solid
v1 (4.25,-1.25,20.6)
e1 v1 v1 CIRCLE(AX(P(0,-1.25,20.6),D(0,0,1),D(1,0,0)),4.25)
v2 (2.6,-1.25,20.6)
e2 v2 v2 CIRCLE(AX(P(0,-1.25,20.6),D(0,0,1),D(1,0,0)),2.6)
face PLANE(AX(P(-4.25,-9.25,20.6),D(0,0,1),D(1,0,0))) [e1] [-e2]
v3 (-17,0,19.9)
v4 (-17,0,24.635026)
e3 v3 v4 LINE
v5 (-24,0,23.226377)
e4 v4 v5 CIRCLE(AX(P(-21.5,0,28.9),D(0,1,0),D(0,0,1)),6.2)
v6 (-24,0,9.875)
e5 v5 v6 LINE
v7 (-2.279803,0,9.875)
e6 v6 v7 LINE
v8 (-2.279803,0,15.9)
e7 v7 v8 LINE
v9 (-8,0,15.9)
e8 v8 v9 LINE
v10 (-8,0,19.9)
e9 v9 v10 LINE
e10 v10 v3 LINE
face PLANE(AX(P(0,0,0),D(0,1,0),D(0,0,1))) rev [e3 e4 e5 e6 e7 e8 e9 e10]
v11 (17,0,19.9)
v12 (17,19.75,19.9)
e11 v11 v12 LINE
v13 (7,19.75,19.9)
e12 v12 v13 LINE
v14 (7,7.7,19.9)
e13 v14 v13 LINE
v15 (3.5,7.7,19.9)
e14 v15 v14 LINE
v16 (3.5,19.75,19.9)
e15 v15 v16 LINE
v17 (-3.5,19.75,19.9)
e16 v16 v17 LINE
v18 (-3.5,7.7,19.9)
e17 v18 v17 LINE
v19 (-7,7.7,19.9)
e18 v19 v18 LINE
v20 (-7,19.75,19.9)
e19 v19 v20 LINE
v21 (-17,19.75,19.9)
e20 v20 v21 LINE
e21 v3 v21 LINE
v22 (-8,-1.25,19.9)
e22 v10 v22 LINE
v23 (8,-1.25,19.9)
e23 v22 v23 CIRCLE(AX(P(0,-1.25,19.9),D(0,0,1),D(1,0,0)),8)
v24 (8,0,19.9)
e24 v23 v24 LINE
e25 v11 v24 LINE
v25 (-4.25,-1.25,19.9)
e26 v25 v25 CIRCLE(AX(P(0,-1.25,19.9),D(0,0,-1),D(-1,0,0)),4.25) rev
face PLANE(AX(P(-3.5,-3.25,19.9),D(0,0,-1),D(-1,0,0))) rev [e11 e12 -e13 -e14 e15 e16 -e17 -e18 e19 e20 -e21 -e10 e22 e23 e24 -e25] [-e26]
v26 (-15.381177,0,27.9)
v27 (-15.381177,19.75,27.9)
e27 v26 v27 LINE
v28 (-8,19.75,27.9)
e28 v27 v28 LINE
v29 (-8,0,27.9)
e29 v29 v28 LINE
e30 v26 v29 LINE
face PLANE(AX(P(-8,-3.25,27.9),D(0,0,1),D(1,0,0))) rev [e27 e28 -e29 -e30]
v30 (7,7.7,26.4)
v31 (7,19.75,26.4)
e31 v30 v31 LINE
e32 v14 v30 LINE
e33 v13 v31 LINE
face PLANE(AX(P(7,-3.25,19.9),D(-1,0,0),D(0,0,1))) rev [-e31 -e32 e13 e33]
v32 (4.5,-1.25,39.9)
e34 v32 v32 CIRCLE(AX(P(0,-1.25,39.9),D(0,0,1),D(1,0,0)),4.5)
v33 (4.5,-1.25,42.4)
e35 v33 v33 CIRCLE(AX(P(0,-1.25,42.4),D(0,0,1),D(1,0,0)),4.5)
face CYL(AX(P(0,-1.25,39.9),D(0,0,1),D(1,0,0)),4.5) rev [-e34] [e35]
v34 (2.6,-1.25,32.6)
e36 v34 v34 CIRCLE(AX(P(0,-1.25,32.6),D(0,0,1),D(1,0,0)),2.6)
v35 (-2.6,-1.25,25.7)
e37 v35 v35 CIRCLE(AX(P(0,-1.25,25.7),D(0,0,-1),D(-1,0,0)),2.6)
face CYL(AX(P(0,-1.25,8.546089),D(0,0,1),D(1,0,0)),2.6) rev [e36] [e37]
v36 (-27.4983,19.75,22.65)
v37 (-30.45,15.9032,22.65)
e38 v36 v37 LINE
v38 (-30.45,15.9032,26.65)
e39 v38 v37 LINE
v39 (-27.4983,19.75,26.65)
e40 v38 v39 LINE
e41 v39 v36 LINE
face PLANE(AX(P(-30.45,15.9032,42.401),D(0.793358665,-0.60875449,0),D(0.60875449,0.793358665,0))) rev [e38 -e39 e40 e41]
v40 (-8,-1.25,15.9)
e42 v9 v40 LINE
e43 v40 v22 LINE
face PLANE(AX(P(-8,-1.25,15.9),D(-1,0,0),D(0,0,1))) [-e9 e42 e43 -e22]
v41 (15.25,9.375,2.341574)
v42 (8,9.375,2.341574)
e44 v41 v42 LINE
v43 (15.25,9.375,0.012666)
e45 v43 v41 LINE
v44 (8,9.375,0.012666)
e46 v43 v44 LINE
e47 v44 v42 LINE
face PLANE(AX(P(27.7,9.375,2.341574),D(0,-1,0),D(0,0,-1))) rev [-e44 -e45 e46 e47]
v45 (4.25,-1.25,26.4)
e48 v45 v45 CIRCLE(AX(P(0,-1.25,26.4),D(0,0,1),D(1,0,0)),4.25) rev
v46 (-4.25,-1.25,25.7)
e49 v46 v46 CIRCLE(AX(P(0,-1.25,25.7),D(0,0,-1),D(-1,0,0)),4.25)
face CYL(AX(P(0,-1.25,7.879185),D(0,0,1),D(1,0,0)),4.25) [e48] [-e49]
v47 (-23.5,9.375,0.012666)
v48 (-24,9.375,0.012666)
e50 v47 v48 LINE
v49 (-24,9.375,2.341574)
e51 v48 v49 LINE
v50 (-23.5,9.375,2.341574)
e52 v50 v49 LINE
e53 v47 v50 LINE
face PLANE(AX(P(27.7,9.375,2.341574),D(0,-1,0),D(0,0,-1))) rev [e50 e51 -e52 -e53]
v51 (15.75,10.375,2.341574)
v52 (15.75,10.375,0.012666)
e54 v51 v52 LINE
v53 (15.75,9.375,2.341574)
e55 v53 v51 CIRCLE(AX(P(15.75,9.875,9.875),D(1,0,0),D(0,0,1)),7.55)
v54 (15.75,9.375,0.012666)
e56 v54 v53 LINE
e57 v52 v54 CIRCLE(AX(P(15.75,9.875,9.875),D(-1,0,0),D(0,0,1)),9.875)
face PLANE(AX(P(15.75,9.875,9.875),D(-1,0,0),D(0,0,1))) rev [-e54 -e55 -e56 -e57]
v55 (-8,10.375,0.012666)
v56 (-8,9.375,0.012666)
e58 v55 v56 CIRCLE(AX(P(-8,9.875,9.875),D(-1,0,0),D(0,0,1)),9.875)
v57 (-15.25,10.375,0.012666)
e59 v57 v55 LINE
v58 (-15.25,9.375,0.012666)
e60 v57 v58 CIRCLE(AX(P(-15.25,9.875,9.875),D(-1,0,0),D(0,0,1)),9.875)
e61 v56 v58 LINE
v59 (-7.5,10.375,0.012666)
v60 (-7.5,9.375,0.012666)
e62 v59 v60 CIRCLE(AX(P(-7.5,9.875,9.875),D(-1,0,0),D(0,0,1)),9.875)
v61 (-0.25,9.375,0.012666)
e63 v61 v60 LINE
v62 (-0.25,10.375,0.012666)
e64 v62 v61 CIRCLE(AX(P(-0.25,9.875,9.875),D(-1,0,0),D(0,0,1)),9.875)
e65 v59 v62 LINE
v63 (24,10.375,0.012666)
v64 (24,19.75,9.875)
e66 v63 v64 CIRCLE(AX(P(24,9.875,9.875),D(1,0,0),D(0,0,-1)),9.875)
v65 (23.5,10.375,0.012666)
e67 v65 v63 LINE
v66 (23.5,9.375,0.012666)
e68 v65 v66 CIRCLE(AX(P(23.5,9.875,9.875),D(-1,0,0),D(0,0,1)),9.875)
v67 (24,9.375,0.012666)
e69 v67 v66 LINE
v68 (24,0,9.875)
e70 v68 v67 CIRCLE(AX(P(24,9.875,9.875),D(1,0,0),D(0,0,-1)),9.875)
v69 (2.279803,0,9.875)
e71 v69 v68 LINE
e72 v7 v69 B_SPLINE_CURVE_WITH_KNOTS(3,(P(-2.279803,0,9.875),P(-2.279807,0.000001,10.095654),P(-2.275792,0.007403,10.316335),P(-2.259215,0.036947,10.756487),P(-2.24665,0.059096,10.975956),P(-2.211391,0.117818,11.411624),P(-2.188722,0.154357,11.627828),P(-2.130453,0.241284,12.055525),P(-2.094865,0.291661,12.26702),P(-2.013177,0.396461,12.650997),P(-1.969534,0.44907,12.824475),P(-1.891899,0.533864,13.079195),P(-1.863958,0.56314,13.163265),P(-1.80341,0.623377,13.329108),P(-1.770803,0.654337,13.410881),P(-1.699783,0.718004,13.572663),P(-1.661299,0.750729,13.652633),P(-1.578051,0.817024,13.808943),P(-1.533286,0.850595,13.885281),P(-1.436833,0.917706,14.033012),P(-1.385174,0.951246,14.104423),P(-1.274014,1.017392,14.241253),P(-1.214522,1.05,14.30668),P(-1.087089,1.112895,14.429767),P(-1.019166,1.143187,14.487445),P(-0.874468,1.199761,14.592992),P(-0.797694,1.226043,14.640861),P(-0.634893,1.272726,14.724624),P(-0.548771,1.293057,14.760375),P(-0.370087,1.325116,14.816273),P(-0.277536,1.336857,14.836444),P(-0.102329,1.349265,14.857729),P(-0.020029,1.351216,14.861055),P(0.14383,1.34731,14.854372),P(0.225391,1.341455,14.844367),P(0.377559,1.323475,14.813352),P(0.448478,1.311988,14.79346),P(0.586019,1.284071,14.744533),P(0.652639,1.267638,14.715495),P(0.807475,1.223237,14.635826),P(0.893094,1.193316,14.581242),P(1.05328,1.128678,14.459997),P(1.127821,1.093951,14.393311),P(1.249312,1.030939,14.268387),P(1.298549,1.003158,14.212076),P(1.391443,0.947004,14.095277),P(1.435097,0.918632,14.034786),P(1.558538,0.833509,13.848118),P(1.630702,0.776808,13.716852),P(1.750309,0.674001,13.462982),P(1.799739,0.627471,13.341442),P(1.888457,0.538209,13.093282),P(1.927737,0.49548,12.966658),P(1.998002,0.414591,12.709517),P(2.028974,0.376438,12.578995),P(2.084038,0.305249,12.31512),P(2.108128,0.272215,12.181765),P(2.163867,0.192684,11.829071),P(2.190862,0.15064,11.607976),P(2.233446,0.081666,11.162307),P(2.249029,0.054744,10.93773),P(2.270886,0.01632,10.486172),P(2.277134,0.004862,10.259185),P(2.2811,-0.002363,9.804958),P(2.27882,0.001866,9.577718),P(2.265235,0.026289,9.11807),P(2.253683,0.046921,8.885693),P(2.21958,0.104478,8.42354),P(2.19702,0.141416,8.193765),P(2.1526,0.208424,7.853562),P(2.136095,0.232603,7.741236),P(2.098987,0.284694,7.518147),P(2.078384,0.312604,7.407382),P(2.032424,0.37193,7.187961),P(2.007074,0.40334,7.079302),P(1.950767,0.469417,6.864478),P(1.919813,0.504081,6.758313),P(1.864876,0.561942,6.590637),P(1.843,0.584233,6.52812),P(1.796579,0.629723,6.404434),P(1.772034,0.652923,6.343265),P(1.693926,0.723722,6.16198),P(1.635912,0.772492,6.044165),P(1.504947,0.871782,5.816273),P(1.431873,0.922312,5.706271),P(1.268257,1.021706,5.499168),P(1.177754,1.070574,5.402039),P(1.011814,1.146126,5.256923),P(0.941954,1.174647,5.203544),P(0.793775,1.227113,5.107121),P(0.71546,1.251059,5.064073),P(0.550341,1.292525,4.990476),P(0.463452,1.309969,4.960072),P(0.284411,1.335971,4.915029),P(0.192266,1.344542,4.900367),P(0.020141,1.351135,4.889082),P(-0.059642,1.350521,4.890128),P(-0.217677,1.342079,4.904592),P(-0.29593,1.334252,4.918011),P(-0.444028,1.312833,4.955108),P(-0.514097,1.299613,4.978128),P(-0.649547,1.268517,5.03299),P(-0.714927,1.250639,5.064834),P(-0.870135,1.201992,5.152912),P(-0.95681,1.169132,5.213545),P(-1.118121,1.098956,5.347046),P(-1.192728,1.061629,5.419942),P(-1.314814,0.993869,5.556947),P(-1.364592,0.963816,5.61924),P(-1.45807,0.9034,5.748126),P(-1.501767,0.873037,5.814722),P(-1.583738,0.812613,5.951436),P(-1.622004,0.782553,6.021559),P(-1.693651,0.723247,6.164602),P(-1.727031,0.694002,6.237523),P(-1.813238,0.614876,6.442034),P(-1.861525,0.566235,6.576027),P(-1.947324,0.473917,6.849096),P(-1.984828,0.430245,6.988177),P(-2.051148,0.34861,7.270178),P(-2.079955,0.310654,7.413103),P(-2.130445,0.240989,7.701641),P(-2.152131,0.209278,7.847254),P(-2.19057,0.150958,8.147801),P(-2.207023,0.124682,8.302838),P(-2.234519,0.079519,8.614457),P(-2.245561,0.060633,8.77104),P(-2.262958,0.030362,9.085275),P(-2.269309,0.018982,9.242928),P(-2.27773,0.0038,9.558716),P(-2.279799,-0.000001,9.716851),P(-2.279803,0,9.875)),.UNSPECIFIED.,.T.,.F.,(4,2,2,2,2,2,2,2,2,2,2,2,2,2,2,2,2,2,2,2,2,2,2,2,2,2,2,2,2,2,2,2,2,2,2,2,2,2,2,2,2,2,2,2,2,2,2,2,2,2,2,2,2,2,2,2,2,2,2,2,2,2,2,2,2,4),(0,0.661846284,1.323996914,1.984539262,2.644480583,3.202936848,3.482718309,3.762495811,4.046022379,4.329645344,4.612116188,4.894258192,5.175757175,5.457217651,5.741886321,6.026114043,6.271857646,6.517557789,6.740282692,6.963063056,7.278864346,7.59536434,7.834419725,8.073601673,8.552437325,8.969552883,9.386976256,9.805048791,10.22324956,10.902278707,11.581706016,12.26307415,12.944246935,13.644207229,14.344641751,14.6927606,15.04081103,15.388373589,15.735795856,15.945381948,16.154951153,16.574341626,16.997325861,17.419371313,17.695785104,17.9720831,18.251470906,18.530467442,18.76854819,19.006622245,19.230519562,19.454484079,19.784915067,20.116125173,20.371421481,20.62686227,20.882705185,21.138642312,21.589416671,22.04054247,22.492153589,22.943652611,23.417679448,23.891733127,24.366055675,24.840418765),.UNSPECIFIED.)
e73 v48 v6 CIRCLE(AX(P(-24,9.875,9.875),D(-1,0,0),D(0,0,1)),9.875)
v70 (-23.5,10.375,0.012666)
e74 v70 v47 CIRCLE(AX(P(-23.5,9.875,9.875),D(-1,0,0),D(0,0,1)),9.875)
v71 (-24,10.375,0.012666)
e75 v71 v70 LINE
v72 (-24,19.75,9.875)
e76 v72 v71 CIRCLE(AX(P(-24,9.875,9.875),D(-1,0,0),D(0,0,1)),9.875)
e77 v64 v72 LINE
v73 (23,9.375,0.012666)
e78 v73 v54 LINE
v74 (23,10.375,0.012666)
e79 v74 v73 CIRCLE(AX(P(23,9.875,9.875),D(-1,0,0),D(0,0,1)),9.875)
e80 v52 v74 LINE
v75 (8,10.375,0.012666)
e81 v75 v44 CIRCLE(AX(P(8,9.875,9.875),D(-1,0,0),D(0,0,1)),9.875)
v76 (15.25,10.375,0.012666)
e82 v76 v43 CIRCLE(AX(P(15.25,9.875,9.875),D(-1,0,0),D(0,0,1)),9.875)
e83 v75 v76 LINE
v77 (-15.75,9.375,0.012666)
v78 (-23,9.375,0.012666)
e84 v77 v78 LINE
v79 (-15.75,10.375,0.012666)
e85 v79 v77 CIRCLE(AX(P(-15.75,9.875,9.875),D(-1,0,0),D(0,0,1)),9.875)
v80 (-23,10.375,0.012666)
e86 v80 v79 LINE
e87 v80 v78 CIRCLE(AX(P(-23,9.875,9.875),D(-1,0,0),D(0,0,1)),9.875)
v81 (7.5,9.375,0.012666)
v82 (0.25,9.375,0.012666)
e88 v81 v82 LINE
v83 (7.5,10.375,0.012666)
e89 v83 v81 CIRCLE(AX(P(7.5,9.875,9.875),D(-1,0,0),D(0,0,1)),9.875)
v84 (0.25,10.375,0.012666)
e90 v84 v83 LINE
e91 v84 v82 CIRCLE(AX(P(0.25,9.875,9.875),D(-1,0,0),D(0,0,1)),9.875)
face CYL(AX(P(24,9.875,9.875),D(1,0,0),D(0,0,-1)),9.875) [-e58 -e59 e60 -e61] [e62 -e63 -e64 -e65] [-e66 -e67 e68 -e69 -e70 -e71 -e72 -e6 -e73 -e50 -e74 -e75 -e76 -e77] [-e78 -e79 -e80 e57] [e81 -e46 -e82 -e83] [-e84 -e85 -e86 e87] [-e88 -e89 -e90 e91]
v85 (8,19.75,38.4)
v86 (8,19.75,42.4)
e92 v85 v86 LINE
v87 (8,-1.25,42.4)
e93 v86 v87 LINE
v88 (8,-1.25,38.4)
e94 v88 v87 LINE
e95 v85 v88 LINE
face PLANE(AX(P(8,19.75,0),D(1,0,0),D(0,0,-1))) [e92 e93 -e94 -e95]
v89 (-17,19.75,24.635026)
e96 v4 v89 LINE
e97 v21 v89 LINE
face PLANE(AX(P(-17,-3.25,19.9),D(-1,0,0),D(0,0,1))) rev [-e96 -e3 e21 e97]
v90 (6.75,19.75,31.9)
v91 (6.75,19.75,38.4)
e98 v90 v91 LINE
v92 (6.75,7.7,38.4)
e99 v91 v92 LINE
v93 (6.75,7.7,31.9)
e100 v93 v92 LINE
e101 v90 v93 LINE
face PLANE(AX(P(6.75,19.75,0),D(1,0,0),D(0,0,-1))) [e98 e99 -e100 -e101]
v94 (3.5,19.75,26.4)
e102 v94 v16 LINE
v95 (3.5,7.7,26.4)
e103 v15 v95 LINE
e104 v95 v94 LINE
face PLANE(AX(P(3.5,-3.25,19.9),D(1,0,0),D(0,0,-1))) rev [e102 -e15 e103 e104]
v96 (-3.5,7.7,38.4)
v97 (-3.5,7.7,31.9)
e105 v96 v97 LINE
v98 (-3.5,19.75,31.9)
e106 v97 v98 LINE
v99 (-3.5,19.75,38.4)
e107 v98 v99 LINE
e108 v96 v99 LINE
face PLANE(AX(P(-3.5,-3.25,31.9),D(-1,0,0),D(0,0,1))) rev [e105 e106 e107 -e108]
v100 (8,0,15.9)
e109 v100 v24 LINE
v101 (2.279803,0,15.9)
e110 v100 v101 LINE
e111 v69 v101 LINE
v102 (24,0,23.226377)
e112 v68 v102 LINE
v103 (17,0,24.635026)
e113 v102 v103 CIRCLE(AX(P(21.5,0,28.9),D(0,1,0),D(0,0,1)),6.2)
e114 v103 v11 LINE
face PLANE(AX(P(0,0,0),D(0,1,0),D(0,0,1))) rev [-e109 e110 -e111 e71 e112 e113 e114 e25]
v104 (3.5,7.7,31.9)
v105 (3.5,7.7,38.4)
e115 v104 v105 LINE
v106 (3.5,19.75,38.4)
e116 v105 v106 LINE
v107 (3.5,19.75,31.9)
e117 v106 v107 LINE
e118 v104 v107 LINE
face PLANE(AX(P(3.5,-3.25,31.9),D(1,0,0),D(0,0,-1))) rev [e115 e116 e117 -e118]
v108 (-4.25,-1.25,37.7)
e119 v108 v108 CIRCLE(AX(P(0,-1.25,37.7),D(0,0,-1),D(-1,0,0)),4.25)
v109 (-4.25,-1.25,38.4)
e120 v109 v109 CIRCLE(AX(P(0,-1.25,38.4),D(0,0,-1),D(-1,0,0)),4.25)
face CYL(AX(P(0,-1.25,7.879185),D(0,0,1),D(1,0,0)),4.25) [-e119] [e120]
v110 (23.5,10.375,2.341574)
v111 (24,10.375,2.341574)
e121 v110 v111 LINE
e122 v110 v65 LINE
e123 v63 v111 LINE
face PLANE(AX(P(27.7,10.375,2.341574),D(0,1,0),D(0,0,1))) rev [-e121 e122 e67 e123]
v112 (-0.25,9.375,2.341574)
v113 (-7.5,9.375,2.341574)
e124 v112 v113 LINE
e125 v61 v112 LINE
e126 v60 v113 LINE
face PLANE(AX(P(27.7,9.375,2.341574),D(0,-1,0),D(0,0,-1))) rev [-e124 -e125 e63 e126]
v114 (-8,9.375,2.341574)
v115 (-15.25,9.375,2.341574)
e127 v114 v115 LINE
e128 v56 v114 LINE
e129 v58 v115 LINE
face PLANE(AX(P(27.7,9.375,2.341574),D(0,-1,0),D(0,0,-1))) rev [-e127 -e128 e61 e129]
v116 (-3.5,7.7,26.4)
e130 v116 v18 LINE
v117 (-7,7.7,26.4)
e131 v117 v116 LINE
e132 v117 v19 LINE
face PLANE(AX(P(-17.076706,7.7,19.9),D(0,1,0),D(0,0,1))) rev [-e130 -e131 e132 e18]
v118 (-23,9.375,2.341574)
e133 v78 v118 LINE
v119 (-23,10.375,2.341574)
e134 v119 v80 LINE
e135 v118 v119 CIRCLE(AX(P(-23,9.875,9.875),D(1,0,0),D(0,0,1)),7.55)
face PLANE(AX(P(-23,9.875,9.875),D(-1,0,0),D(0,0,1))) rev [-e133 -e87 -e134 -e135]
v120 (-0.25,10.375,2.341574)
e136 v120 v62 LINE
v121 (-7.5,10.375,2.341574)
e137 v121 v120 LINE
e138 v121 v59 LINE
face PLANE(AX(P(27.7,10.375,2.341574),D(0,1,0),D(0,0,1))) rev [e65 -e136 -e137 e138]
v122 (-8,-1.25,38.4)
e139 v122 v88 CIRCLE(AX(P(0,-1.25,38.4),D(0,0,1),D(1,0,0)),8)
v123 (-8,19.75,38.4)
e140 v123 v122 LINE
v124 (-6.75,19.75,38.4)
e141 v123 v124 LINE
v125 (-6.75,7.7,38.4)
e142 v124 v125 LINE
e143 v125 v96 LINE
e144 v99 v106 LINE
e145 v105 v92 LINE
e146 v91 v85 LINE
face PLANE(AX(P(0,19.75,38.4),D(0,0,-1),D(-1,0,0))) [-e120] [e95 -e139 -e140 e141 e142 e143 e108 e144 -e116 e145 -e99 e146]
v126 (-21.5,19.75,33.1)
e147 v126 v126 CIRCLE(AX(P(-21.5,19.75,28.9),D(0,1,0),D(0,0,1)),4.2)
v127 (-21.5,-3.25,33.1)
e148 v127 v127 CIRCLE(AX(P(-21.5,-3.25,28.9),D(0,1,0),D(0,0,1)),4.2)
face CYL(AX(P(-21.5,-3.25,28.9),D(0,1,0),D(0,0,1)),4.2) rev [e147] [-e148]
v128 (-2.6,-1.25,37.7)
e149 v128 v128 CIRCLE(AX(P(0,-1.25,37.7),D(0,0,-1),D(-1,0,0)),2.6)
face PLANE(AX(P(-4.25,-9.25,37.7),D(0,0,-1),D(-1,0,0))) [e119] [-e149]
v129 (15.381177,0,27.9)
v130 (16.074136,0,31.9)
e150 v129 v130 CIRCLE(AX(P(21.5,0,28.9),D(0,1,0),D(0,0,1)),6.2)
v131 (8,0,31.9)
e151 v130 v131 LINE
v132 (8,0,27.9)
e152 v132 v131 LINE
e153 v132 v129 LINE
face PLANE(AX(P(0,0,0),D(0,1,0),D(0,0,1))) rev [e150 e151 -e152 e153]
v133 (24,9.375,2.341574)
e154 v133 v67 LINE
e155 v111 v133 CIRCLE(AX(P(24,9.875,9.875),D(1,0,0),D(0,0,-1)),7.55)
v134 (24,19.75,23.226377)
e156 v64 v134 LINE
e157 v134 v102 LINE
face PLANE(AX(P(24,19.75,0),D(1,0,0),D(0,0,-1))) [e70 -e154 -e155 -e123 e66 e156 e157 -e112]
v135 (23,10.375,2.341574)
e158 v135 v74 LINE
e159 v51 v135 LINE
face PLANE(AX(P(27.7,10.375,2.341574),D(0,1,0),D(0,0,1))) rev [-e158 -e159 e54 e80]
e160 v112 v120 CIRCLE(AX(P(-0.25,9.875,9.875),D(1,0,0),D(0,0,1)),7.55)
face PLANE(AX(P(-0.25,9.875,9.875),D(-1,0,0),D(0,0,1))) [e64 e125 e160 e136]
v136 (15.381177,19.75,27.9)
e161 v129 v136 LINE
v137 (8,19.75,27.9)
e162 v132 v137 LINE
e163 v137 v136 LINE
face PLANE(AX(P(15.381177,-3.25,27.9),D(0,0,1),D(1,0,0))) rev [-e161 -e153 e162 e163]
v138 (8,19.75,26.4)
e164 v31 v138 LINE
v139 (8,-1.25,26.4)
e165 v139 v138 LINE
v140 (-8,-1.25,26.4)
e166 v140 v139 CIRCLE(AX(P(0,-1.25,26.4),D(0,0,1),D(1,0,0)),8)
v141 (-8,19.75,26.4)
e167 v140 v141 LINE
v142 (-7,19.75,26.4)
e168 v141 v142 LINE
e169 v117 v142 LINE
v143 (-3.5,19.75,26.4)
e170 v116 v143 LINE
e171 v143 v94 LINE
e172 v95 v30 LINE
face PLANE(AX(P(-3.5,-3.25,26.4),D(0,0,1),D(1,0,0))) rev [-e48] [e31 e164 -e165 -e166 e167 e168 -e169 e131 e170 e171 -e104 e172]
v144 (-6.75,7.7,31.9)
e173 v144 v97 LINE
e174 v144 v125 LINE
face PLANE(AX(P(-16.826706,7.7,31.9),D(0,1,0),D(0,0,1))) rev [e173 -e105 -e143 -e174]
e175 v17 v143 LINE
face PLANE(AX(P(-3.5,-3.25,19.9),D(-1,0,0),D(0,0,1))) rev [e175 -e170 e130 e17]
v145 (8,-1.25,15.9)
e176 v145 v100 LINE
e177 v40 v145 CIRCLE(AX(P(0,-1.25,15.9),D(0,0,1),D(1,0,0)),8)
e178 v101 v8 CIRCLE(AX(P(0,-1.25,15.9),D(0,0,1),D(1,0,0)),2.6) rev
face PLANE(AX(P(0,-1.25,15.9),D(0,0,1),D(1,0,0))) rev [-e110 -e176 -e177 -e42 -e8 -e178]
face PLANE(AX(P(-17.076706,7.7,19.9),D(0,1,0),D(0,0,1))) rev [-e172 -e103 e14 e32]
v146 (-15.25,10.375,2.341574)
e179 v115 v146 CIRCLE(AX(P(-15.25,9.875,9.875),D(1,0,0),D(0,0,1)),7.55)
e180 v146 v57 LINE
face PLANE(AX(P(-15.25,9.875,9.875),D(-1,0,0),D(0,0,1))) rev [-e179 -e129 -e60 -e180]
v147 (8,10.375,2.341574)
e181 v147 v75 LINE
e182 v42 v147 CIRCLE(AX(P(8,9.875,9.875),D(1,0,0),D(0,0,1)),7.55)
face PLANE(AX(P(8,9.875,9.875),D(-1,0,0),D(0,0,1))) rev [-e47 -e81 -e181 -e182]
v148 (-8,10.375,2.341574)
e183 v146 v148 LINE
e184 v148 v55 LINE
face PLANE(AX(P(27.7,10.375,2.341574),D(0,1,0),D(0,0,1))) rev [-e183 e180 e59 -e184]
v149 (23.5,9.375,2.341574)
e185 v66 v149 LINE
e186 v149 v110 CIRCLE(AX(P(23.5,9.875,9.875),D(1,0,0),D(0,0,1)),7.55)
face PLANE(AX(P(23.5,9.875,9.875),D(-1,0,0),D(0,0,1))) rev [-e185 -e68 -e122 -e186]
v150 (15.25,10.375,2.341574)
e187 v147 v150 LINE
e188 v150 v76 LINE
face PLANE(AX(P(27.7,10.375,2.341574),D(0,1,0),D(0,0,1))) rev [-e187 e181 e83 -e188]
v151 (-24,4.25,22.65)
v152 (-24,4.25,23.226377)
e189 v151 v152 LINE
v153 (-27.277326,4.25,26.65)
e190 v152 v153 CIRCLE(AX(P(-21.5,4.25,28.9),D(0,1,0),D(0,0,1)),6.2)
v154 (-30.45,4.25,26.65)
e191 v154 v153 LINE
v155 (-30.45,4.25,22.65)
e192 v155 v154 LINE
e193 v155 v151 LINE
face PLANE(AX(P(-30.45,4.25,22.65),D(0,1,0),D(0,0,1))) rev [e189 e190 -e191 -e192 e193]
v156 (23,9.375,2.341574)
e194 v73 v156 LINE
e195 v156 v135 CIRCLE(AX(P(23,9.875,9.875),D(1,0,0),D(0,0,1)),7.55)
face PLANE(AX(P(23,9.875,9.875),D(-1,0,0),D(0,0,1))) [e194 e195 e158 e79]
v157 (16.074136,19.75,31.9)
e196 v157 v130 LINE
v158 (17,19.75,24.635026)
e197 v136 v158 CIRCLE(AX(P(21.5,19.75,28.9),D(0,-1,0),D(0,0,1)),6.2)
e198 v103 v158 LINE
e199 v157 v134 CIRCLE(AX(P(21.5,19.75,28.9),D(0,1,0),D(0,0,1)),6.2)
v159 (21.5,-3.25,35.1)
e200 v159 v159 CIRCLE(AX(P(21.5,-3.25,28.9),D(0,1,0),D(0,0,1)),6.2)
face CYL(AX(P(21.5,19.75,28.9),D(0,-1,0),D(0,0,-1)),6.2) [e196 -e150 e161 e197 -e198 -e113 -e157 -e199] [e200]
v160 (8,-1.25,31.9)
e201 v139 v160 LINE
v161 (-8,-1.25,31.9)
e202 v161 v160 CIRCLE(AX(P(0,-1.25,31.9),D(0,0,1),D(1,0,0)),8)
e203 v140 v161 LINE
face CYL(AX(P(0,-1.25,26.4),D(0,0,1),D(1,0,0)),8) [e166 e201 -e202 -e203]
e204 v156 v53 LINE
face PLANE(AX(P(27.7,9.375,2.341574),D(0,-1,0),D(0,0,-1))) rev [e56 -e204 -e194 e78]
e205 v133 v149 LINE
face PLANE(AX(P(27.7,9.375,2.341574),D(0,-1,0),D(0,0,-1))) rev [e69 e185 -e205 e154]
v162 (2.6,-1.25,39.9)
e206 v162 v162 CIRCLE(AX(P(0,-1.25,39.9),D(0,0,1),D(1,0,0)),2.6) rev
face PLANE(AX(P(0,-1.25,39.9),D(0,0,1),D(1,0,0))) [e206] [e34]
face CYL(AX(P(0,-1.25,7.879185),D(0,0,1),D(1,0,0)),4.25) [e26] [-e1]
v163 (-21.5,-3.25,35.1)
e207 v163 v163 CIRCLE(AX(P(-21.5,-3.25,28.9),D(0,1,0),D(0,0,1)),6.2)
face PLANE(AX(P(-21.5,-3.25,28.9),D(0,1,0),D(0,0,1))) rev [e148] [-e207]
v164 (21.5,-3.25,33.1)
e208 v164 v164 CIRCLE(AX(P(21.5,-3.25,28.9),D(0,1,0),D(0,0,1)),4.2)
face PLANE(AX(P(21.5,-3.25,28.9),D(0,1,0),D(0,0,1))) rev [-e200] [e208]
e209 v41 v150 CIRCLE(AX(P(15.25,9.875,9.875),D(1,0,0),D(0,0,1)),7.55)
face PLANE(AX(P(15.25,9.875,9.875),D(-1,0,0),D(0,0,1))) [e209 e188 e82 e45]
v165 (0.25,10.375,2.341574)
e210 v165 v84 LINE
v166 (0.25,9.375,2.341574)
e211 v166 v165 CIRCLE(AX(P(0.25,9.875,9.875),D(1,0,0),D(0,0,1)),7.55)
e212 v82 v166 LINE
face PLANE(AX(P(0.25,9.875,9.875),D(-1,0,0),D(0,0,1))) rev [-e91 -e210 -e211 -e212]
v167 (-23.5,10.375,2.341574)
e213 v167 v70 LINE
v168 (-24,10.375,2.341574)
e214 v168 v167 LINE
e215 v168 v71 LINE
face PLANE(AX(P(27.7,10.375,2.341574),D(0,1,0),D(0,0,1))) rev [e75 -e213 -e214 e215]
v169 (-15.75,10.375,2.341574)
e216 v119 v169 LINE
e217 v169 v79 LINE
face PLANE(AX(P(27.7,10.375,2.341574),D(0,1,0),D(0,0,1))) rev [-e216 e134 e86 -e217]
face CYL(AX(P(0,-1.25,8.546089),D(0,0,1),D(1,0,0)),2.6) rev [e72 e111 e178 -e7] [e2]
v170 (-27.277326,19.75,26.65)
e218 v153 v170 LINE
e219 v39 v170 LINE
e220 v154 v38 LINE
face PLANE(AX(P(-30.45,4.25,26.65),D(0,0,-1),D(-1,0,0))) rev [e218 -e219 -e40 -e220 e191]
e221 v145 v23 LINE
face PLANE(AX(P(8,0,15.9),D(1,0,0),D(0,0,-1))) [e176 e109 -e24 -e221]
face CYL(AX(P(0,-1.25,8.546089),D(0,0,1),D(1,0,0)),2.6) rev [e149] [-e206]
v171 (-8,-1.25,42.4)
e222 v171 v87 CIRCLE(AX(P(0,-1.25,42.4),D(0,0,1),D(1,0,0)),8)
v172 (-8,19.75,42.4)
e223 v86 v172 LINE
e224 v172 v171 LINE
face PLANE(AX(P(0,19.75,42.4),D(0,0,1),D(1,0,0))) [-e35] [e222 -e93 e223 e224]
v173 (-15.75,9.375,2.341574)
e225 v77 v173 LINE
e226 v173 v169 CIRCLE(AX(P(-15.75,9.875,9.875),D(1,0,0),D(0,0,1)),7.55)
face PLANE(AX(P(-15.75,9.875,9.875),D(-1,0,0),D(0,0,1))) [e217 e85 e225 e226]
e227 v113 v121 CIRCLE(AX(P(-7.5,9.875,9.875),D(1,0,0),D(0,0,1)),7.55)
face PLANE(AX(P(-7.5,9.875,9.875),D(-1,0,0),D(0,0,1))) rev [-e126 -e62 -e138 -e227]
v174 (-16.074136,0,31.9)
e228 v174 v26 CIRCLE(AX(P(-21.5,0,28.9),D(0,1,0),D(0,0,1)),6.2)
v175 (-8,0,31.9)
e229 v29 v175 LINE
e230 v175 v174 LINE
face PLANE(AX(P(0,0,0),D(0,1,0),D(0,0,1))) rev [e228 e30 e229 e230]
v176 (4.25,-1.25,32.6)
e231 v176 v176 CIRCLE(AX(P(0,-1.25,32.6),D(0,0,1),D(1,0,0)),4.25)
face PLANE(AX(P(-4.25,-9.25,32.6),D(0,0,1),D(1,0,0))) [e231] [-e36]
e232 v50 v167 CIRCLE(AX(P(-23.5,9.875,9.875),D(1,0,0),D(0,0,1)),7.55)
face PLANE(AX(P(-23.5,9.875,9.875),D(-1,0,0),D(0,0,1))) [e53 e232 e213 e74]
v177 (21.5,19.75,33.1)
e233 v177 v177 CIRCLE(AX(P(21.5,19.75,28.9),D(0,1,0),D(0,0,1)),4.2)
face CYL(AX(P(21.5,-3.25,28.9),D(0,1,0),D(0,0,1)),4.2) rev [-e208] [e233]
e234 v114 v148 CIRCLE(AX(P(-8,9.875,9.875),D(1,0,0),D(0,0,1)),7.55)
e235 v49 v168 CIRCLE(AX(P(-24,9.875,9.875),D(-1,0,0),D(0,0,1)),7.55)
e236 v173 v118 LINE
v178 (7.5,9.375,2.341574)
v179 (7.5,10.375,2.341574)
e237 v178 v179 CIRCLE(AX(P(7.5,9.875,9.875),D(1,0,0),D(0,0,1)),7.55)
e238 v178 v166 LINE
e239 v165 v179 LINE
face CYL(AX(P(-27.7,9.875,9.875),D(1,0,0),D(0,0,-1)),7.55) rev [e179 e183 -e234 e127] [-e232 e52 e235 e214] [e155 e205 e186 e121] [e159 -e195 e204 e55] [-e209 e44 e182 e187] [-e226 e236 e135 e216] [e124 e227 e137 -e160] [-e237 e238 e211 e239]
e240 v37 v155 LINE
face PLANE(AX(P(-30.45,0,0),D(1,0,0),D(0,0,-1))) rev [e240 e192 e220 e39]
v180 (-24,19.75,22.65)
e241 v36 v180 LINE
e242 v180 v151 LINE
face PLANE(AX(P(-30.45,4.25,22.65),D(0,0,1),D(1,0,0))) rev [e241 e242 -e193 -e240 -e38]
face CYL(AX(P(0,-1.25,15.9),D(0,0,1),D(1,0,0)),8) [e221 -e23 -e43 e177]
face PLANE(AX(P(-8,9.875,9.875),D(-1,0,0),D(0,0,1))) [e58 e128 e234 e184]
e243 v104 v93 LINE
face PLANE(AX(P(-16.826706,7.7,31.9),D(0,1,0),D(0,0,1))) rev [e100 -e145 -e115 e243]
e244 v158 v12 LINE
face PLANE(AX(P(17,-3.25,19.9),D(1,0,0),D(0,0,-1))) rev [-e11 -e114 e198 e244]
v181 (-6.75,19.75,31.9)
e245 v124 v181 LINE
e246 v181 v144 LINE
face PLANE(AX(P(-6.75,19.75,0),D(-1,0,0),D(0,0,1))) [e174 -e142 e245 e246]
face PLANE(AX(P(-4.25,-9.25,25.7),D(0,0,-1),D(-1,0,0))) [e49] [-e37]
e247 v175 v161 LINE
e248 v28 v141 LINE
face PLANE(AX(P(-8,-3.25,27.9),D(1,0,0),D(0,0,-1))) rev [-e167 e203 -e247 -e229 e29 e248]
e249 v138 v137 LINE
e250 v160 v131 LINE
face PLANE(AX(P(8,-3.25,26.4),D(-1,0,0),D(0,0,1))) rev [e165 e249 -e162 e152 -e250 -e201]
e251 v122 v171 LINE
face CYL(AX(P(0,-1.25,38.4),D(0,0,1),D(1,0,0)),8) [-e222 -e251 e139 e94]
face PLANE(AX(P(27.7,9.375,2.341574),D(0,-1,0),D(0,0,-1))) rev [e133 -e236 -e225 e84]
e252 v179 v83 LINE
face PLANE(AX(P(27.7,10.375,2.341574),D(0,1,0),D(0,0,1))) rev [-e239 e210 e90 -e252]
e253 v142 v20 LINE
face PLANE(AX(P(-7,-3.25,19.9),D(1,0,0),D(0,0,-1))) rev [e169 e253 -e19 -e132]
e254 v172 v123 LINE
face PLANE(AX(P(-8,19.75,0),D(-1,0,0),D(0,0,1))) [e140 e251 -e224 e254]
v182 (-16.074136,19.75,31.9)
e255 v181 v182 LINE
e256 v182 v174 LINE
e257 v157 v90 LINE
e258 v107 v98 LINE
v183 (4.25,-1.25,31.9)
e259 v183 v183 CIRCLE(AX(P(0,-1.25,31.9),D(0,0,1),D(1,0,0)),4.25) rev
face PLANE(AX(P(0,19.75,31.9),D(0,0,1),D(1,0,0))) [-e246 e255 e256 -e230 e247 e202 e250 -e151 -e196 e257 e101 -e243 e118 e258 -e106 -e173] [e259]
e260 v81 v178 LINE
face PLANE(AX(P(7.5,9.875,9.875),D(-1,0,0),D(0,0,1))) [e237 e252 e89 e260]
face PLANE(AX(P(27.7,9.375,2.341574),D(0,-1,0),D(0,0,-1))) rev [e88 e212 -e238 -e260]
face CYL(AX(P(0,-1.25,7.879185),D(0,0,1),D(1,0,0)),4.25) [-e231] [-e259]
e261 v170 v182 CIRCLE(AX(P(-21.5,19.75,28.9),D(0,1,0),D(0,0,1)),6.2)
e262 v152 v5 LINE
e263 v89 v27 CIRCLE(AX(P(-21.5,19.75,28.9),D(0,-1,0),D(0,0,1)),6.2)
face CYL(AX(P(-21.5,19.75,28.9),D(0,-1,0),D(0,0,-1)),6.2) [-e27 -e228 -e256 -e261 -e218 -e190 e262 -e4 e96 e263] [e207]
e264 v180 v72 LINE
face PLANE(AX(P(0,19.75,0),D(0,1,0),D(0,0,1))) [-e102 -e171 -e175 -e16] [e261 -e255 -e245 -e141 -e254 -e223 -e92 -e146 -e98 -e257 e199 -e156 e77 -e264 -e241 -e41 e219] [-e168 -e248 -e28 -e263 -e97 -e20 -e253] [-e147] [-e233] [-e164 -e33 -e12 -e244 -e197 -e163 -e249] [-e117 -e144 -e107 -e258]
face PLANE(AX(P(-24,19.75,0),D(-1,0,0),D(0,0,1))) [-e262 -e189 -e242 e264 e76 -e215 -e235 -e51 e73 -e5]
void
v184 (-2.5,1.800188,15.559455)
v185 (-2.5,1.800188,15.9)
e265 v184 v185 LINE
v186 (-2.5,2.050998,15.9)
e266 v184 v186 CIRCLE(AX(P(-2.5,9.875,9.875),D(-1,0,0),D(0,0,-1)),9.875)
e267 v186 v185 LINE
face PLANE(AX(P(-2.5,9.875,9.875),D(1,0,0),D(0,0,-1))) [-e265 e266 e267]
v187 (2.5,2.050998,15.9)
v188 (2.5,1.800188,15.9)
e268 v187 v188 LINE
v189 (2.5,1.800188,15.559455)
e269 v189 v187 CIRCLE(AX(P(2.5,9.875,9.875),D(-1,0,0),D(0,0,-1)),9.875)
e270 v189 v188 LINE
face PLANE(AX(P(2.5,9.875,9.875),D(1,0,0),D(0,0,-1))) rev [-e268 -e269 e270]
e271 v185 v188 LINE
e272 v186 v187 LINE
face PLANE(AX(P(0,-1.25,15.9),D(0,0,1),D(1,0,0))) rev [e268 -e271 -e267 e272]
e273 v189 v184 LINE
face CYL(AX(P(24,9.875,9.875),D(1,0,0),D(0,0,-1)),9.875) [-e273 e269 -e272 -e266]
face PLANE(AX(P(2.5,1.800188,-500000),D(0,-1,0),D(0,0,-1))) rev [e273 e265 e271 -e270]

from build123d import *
from build123d.topology import SkipClean

# Parameters (mm, degrees)
BOSS_EXTRUDE1_DEPTH      = 19.75
FILLET1_RADIUS           = 9.875
FILLET1_LENGTH           = 48
SKETCH2_R                = 7.55
CUT_EXTRUDE1_DEPTH       = 70.718810231
BOSS_EXTRUDE2_START      = -23
SKETCH3_R                = 6.2
BOSS_EXTRUDE2_DEPTH      = 23
SKETCH4_R                = 4.2
CUT_EXTRUDE2_DEPTH       = 56.624185387
SKETCH5_W                = 7
SKETCH5_H                = 6.5
CUT_EXTRUDE3_DEPTH       = 56.624185387
BOSS_EXTRUDE3_DEPTH      = 4
CUT_EXTRUDE4_START       = -13.5
CUT_EXTRUDE4_OUTLINE_W   = 6.5
CUT_EXTRUDE4_OUTLINE_H   = 7.7
CUT_EXTRUDE4_DEPTH       = 13.5
BOSS_EXTRUDE4_DEPTH      = 5.5
SKETCH9_W                = 6.5
SKETCH9_H                = 7.7
CUT_EXTRUDE5_DEPTH       = 14
BOSS_EXTRUDE5_DEPTH      = 4
BOSS_EXTRUDE6_REACH      = 53.302
SKETCH11_R               = 4.25
CUT_EXTRUDE7_DEPTH       = 55.36094646
CUT_EXTRUDE7_DEPTH_BACK  = 5
SKETCH13_W               = 8.5
SKETCH13_H               = 5.1
CUT_EXTRUDE8_DEPTH       = 2.5
CUT_EXTRUDE6_REACH       = 56.361
SKETCH12_R               = 2.6
BOSS_EXTRUDE7_REACH      = 45.123
BOSS_EXTRUDE7_END_RADIUS = 9.875
SKETCH17_W               = 2.341574484
SKETCH17_H               = 1
CUT_EXTRUDE9_DEPTH       = 70.718810231
BOSS_EXTRUDE8_START      = -1
BOSS_EXTRUDE8_DEPTH      = 0.5
LPATTERN1_COUNT          = 7
LPATTERN1_PITCH          = 7.75
SKETCH19_R               = 4.5
CUT_EXTRUDE10_DEPTH      = 2.5
SKETCH20_W               = 4
SKETCH20_H               = 15.5
BOSS_EXTRUDE9_DEPTH      = 6.45
CUT_EXTRUDE11_REACH      = 44.782
SKETCH22_R               = 4.2
CUT_EXTRUDE12_DEPTH      = 60.71568052


# Read off the part's stored shape, not the designer's step: Cut-Extrude4
with BuildPart() as part:
    # Sketch1 → Boss-Extrude1 (new body)
    with BuildSketch(Plane(origin=(0, 0, 0), x_dir=(1, 0, 0), z_dir=(0, 1, 0))):
        with BuildLine():
            Line((16.074136013, -31.9), (6.75, -31.9))
            Line((6.75, -31.9), (6.75, -38.4))
            Line((6.75, -38.4), (8, -38.4))
            Line((8, -38.4), (8, -42.4))
            Line((8, -42.4), (-8, -42.4))
            Line((-8, -42.4), (-8, -38.4))
            Line((-8, -38.4), (-6.75, -38.4))
            Line((-6.75, -38.4), (-6.75, -31.9))
            Line((-6.75, -31.9), (-16.074136013, -31.9))
            ThreePointArc((-16.074136013, -31.9), (-26.076909961, -33.082331313), (-24, -23.226376819))
            Line((-24, -23.226376819), (-24, 0))
            Line((-24, 0), (24, 0))
            Line((24, 0), (24, -23.226376819))
            ThreePointArc((24, -23.226376819), (26.076909961, -33.082331313), (16.074136013, -31.9))
        make_face()
    extrude(amount=BOSS_EXTRUDE1_DEPTH)

    # Fillet1: full round fillet: the end face becomes a half cylinder, R = half its width
    fillet1_face = Plane((0, 9.875, 0), x_dir=(1, 0, 0), z_dir=(0, 0, -1))  # on the end face: x along it, z out of the body
    fillet1_slab = fillet1_face.offset(-FILLET1_RADIUS / 2) * Box(FILLET1_LENGTH, 2 * FILLET1_RADIUS, FILLET1_RADIUS, mode=Mode.PRIVATE)  # the body's end, R deep
    fillet1_round = Plane((0, 9.875, 9.875), x_dir=(0, 0, -1), z_dir=(1, 0, 0)) * Cylinder(FILLET1_RADIUS, FILLET1_LENGTH, mode=Mode.PRIVATE)  # its axis R under the face
    add(fillet1_slab - fillet1_round, mode=Mode.SUBTRACT)

    # Sketch2 → Cut-Extrude1 (cut, through all)
    with BuildSketch(Plane(origin=(24, 0, 0), x_dir=(0, 0, -1), z_dir=(1, 0, 0))):
        with Locations((-9.875, 9.875)):
            Circle(SKETCH2_R)
    extrude(amount=-CUT_EXTRUDE1_DEPTH, mode=Mode.SUBTRACT)

    # Sketch3 → Boss-Extrude2 (add)
    with SkipClean():  # the faces are left unmerged after this step: merging them gives an invalid solid
        with BuildSketch(Plane(origin=(0, 19.75, 0), x_dir=(1, 0, 0), z_dir=(0, 1, 0)).offset(BOSS_EXTRUDE2_START)):
            with Locations(Location((21.5, -28.9, 0), (0, 0, 66.220005269))):
                Circle(SKETCH3_R)
            with Locations(Location((-21.5, -28.9, 0), (0, 0, 113.779994731))):
                Circle(SKETCH3_R)
        extrude(amount=BOSS_EXTRUDE2_DEPTH)

    # Sketch4 → Cut-Extrude2 (cut, through all)
    with SkipClean():  # the faces are left unmerged after this step: merging them gives an invalid solid
        with BuildSketch(Plane(origin=(0, 19.75, 0), x_dir=(1, 0, 0), z_dir=(0, 1, 0))):
            with Locations(Location((-21.5, -28.9, 0), (0, 0, 270))):
                Circle(SKETCH4_R)
            with Locations(Location((21.5, -28.9, 0), (0, 0, 270))):
                Circle(SKETCH4_R)
        extrude(amount=-CUT_EXTRUDE2_DEPTH, mode=Mode.SUBTRACT)

    # Sketch5 → Cut-Extrude3 (cut, through all)
    with SkipClean():  # the faces are left unmerged after this step: merging them gives an invalid solid
        with BuildSketch(Plane(origin=(0, 19.75, 0), x_dir=(1, 0, 0), z_dir=(0, 1, 0))):
            with Locations((0, -23.15)):
                Rectangle(SKETCH5_W, SKETCH5_H)
            with Locations((0, -35.15)):
                Rectangle(SKETCH5_W, SKETCH5_H)
            with BuildLine():
                Line((17, -19.9), (7, -19.9))
                Line((7, -19.9), (7, -26.4))
                Line((7, -26.4), (8, -26.4))
                Line((8, -26.4), (8, -27.9))
                Line((8, -27.9), (15.381176584, -27.9))
                ThreePointArc((15.381176584, -27.9), (15.945284357, -26.145887779), (17, -24.635026378))
                Line((17, -24.635026378), (17, -19.9))
            make_face()
            with BuildLine():
                Line((-7, -19.9), (-17, -19.9))
                Line((-17, -19.9), (-17, -24.635026378))
                ThreePointArc((-17, -24.635026378), (-15.945284357, -26.145887779), (-15.381176584, -27.9))
                Line((-15.381176584, -27.9), (-8, -27.9))
                Line((-8, -27.9), (-8, -26.4))
                Line((-8, -26.4), (-7, -26.4))
                Line((-7, -26.4), (-7, -19.9))
            make_face()
        extrude(amount=-CUT_EXTRUDE3_DEPTH, mode=Mode.SUBTRACT)

    # Sketch6 → Boss-Extrude3 (add)
    with SkipClean():  # the faces are left unmerged after this step: merging them gives an invalid solid
        with BuildSketch(Plane.XY.offset(42.4)):
            with BuildLine():
                Line((-8, 0), (-8, -1.25))
                ThreePointArc((-8, -1.25), (0, -9.25), (8, -1.25))
                Line((8, -1.25), (8, 0))
                Line((8, 0), (-8, 0))
            make_face()
        extrude(amount=-BOSS_EXTRUDE3_DEPTH)

    # Cut-Extrude4 outline → Cut-Extrude4 (cut)
    with SkipClean():  # the faces are left unmerged after this step: merging them gives an invalid solid
        with BuildSketch(Plane(origin=(6.75, 0, 0), x_dir=(0, 0, -1), z_dir=(1, 0, 0)).offset(CUT_EXTRUDE4_START)):
            with Locations((-35.15, 3.85)):
                Rectangle(CUT_EXTRUDE4_OUTLINE_W, CUT_EXTRUDE4_OUTLINE_H)
        extrude(amount=CUT_EXTRUDE4_DEPTH, mode=Mode.SUBTRACT)
    add(part.part.scale(1), mode=Mode.REPLACE)  # the faces are merged on a copy

    # Sketch8 → Boss-Extrude4 (add)
    with BuildSketch(Plane.XY.offset(31.9)):
        with BuildLine():
            Line((-8, -1.25), (-8, 0))
            Line((-8, 0), (8, 0))
            Line((8, 0), (8, -1.25))
            ThreePointArc((8, -1.25), (0, -9.25), (-8, -1.25))
        make_face()
    extrude(amount=-BOSS_EXTRUDE4_DEPTH)

    # Sketch9 → Cut-Extrude5 (cut)
    with BuildSketch(Plane(origin=(7, 0, 0), x_dir=(0, 0, -1), z_dir=(1, 0, 0))):
        with Locations((-23.15, 3.85)):
            Rectangle(SKETCH9_W, SKETCH9_H)
    extrude(amount=-CUT_EXTRUDE5_DEPTH, mode=Mode.SUBTRACT)

    # Sketch10 → Boss-Extrude5 (add)
    with BuildSketch(Plane.XY.offset(19.9)):
        with BuildLine():
            Line((-8, -1.25), (-8, 0))
            Line((-8, 0), (8, 0))
            Line((8, 0), (8, -1.25))
            ThreePointArc((8, -1.25), (0, -9.25), (-8, -1.25))
        make_face()
    extrude(amount=-BOSS_EXTRUDE5_DEPTH)

    # Boss-Extrude6: up to this face of the body (flat: up to its plane)
    boss_extrude6_end = Plane(part.part.faces().sort_by_distance((0, 13.725, 19.9))[0])
    # Sketch11 → Boss-Extrude6 (add, up to the picked face)
    with BuildSketch(Plane(origin=(0, 0, 38.4), x_dir=(-1, 0, 0), z_dir=(0, 0, -1)), mode=Mode.PRIVATE) as boss_extrude6_sk1:
        with Locations(Location((0, -1.25, 0), (0, 0, 180))):
            Circle(SKETCH11_R)
    boss_extrude6_tool1 = split(extrude(boss_extrude6_sk1.sketch, amount=BOSS_EXTRUDE6_REACH, mode=Mode.PRIVATE), bisect_by=boss_extrude6_end, keep=Keep.BOTH, mode=Mode.PRIVATE)
    add(boss_extrude6_tool1.solids().sort_by(Axis((0, -1.25, 38.4), (0, 0, -1)))[0])

    # Sketch13 → Cut-Extrude7 (cut, two sides: drawn at the far end of the back side and taken through both)
    with BuildSketch(Plane.XZ.offset(-CUT_EXTRUDE7_DEPTH_BACK)):
        with Locations((0, 35.15)):
            Rectangle(SKETCH13_W, SKETCH13_H)
        with Locations((0, 23.15)):
            Rectangle(SKETCH13_W, SKETCH13_H)
    extrude(amount=CUT_EXTRUDE7_DEPTH + CUT_EXTRUDE7_DEPTH_BACK, mode=Mode.SUBTRACT)

    # Sketch15 → Cut-Extrude8 (cut, symmetric)
    with BuildSketch(Plane(origin=(0, 0, 0), x_dir=(0, 0, -1), z_dir=(1, 0, 0))):
        with BuildLine():
            Line((-15.9, 0), (-15.9, 2.050998466))
            ThreePointArc((-15.9, 2.050998466), (-13.05726412, 0.526801239), (-9.875, 0))
            Line((-9.875, 0), (-15.9, 0))
        make_face()
    extrude(amount=CUT_EXTRUDE8_DEPTH, both=True, mode=Mode.SUBTRACT)

    # Cut-Extrude6: up to this face of the body (flat: up to its plane)
    cut_extrude6_end = Plane(part.part.faces().sort_by_distance((0, -3.978206263, 15.9))[0])
    # Sketch12 → Cut-Extrude6 (cut, up to the picked face)
    with BuildSketch(Plane.XY.offset(42.4), mode=Mode.PRIVATE) as cut_extrude6_sk1:
        with Locations((0, -1.25)):
            Circle(SKETCH12_R)
    cut_extrude6_tool1 = split(extrude(cut_extrude6_sk1.sketch, amount=-CUT_EXTRUDE6_REACH, mode=Mode.PRIVATE), bisect_by=cut_extrude6_end, keep=Keep.BOTH, mode=Mode.PRIVATE)
    add(cut_extrude6_tool1.solids().sort_by(Axis((0, -1.25, 42.4), (0, 0, -1)))[0], mode=Mode.SUBTRACT)

    # Boss-Extrude7: up to this cylinder (the profile starts outside it)
    boss_extrude7_end = Plane(origin=(2.389901, 9.875, 9.875), z_dir=(1, 0, 0)) * Cylinder(BOSS_EXTRUDE7_END_RADIUS, 110.996, mode=Mode.PRIVATE)
    # Sketch16 → Boss-Extrude7 (add, up to the surface)
    with BuildSketch(Plane(origin=(0, 0, 15.9), x_dir=(-1, 0, 0), z_dir=(0, 0, -1)), mode=Mode.PRIVATE) as boss_extrude7_sk1:
        with BuildLine():
            Line((-2.279802623, 0), (-2.5, 0))
            Line((-2.5, 0), (-2.5, 1.800187721))
            Line((-2.5, 1.800187721), (2.5, 1.800187721))
            Line((2.5, 1.800187721), (2.5, 0))
            Line((2.5, 0), (2.279802623, 0))
            ThreePointArc((2.279802623, 0), (0, 1.35), (-2.279802623, 0))
        make_face()
    boss_extrude7_tool1 = extrude(boss_extrude7_sk1.sketch, amount=BOSS_EXTRUDE7_REACH, mode=Mode.PRIVATE) - boss_extrude7_end
    add(boss_extrude7_tool1.solids().sort_by_distance((2.389901, 0.053142, 15.9))[0])

    # Sketch17 → Cut-Extrude9 (cut, through all)
    with BuildSketch(Plane.ZY.offset(24)):
        with Locations((1.170787242, 9.875)):
            Rectangle(SKETCH17_W, SKETCH17_H)
    extrude(amount=-CUT_EXTRUDE9_DEPTH, mode=Mode.SUBTRACT)

    # Sketch18 → Boss-Extrude8 (add)
    with BuildSketch(Plane.ZY.offset(24).offset(BOSS_EXTRUDE8_START)):
        with BuildLine():
            Line((0.012666351, 10.375), (2.341574484, 10.375))
            ThreePointArc((2.341574484, 10.375), (2.325, 9.875), (2.341574484, 9.375))
            Line((2.341574484, 9.375), (0.012666351, 9.375))
            ThreePointArc((0.012666351, 9.375), (0, 9.875), (0.012666351, 10.375))
        make_face()
    boss_extrude8 = extrude(amount=BOSS_EXTRUDE8_DEPTH)

    # LPattern1: Boss-Extrude8 ×7
    with Locations(*[(i * LPATTERN1_PITCH, 0, 0) for i in range(1, LPATTERN1_COUNT)]):
        add(boss_extrude8)

    # Sketch19 → Cut-Extrude10 (cut)
    with BuildSketch(Plane.XY.offset(42.4)):
        with Locations((0, -1.25)):
            Circle(SKETCH19_R)
    extrude(amount=-CUT_EXTRUDE10_DEPTH, mode=Mode.SUBTRACT)

    # Sketch20 → Boss-Extrude9 (add)
    with BuildSketch(Plane.ZY.offset(24)):
        with Locations((24.65, 12)):
            Rectangle(SKETCH20_W, SKETCH20_H)
    extrude(amount=BOSS_EXTRUDE9_DEPTH)

    # Sketch21 → Cut-Extrude11 (cut, up to next)
    with BuildSketch(Plane(origin=(0, 0, 22.65), x_dir=(-1, 0, 0), z_dir=(0, 0, -1)), mode=Mode.PRIVATE) as cut_extrude11_sk1:
        Polygon((27.4983, 19.75), (30.45, 19.75), (30.45, 15.9032), align=None)
    cut_extrude11_tool1 = extrude(cut_extrude11_sk1.sketch, amount=-CUT_EXTRUDE11_REACH, mode=Mode.PRIVATE) & part.part
    add(cut_extrude11_tool1.solids().sort_by_distance((-29.4661, 18.467733, 22.65))[0], mode=Mode.SUBTRACT)

    # Sketch22 → Cut-Extrude12 (cut, through all)
    with BuildSketch(Plane(origin=(0, 19.75, 0), x_dir=(1, 0, 0), z_dir=(0, 1, 0))):
        with Locations(Location((-21.5, -28.9, 0), (0, 0, 270))):
            Circle(SKETCH22_R)
    extrude(amount=-CUT_EXTRUDE12_DEPTH, mode=Mode.SUBTRACT)


solid = part.part
